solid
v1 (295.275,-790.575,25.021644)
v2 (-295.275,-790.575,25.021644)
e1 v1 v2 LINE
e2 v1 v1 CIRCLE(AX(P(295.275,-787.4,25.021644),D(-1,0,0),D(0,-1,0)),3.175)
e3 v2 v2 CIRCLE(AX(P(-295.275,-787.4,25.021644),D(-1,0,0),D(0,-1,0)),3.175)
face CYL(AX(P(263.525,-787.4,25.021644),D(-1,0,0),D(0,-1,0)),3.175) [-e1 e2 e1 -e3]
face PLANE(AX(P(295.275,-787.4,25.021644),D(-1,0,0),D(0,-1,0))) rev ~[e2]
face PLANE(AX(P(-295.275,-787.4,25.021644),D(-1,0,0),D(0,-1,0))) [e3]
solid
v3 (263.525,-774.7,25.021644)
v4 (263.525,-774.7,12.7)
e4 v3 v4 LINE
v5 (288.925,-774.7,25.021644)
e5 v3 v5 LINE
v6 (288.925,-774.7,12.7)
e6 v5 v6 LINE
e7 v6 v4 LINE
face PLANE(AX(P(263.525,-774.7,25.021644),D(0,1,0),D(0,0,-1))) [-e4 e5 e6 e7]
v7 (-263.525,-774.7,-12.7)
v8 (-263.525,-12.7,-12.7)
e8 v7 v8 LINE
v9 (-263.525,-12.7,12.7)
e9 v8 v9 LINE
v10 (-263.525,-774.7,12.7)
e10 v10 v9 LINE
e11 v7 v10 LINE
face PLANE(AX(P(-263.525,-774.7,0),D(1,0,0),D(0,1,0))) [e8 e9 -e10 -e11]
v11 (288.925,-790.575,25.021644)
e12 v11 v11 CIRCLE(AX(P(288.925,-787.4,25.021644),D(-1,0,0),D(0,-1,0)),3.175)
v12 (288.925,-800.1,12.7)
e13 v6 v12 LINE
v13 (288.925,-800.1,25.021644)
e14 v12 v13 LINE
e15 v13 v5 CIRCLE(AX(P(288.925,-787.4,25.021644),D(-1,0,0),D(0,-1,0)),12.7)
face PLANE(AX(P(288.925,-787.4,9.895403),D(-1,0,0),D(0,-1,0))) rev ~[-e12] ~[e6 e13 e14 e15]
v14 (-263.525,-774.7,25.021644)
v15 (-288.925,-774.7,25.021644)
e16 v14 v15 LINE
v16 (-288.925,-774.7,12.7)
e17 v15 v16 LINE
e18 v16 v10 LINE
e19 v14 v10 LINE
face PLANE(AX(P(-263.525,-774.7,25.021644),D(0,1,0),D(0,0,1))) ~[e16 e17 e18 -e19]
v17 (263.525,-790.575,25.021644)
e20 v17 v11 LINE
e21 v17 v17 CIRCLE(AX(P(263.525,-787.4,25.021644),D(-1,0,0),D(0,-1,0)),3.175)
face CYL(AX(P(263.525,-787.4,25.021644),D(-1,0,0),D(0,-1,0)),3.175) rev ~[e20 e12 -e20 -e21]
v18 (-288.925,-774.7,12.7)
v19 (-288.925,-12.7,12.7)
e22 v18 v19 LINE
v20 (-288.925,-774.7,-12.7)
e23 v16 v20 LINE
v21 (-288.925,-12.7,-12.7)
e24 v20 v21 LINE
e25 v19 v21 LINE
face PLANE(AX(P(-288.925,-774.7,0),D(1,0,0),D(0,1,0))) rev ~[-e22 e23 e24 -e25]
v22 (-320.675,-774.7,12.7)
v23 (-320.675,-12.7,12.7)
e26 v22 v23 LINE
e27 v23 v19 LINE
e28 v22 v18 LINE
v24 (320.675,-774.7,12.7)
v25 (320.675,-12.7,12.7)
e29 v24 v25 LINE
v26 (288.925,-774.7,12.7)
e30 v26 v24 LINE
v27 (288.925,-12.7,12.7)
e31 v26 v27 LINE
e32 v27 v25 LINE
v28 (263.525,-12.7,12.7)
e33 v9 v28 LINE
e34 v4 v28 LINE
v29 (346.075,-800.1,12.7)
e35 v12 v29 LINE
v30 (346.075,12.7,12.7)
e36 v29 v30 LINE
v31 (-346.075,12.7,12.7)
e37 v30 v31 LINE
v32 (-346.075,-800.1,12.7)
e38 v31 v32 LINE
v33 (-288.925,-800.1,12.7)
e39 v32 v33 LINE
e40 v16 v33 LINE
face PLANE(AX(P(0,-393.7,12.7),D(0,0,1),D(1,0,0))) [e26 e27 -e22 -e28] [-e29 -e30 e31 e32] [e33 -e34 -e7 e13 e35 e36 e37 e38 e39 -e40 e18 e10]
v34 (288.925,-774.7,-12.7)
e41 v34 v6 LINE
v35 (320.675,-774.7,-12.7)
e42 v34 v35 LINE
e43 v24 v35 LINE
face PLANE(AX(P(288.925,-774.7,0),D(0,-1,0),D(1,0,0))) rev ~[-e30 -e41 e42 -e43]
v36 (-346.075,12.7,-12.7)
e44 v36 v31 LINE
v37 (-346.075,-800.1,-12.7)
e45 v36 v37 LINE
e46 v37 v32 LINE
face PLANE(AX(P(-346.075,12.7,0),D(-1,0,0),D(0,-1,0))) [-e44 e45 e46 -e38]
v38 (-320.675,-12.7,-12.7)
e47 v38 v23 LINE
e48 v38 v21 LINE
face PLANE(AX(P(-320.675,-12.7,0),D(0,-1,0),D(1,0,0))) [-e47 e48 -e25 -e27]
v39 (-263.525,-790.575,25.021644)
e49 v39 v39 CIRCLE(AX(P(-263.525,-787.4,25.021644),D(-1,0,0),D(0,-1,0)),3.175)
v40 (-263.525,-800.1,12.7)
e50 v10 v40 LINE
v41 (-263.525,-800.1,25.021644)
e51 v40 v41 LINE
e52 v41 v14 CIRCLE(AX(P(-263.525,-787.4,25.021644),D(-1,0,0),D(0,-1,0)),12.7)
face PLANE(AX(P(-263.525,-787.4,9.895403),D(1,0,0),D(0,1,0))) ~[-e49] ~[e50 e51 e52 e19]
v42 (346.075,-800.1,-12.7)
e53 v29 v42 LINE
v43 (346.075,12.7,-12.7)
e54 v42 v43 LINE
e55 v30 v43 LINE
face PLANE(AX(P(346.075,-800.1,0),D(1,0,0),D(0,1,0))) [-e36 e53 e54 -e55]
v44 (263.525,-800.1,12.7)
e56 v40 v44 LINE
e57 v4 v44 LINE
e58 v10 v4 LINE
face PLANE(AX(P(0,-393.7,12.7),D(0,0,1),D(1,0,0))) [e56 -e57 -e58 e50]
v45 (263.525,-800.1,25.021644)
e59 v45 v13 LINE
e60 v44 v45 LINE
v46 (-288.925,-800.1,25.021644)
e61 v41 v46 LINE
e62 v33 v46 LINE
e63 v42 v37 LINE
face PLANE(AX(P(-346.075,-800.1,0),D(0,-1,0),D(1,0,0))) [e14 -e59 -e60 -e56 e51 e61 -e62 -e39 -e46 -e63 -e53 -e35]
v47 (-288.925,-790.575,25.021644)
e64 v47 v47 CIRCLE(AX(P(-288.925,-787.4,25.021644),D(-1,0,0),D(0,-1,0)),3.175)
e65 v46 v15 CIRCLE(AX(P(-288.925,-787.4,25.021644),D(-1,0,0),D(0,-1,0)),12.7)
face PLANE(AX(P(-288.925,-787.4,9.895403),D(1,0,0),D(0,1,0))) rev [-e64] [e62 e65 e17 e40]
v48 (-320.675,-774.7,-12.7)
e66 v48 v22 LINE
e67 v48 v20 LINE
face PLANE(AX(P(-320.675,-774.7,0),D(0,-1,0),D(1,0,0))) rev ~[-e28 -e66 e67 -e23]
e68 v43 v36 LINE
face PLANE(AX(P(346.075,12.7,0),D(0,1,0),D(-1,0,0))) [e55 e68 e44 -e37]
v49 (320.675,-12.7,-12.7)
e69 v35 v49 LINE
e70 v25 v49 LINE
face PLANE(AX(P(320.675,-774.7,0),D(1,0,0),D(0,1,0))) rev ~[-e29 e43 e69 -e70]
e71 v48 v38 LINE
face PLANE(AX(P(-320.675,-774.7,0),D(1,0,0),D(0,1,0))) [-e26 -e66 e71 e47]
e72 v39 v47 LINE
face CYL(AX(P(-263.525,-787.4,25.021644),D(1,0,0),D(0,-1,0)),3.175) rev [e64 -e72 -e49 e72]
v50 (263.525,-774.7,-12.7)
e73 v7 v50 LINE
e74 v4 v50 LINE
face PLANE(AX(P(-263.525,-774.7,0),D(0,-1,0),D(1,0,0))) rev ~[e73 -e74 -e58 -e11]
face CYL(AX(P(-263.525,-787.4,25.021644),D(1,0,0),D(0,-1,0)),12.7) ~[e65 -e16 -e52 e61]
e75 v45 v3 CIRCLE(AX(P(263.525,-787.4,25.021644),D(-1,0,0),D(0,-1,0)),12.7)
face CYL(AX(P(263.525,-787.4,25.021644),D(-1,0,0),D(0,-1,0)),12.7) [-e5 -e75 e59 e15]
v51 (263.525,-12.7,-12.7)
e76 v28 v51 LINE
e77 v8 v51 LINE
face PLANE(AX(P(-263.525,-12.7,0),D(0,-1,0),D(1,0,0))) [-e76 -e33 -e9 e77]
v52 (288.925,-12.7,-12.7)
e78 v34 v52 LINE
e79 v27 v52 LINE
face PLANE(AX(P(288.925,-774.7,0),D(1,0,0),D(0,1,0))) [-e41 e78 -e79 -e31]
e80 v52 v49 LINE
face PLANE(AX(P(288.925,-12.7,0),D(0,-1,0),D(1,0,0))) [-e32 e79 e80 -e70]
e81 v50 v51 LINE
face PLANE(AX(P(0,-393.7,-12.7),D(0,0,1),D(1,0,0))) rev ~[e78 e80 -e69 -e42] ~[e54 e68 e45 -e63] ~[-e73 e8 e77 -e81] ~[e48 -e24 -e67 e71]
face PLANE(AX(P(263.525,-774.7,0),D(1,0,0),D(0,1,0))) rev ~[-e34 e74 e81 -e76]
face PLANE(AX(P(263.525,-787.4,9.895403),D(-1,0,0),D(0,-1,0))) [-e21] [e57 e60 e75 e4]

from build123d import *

# Parameters (mm, degrees)
F0_W     = 31.75
F0_H     = 762
F0_W_2   = 527.05
F1_DEPTH = 12.7
F2_R     = 3.175
F3_DEPTH = 25.4
F4_DEPTH = 558.8
F5_DEPTH = 31.75


# Not quite as in the source:
# - a pattern or mirror of a feature is missing from the dataset's text; its kind, count and spacing are read off the source's solid


with BuildPart() as f1:
    # F0 (on Top) → F1 (new body, symmetric)
    with BuildSketch(Plane.XY):
        Polygon((346.075, -12.7), (346.075, 12.7), (-346.075, 12.7), (-346.075, -800.1), (346.075, -800.1), align=None)
        with Locations((-304.8, -393.7)):
            Rectangle(F0_W, F0_H, mode=Mode.SUBTRACT)
        with Locations((0, -393.7)):
            Rectangle(F0_W_2, F0_H, mode=Mode.SUBTRACT)
        with Locations((304.8, -393.7)):
            Rectangle(F0_W, F0_H, mode=Mode.SUBTRACT)
    extrude(amount=F1_DEPTH, both=True)

    # F2 (on face) → F3 (join)
    with BuildSketch(Plane(origin=(263.525, 0, 0), x_dir=(0, -1, 0), z_dir=(-1, 0, 0))):
        with BuildLine():
            Line((800.1, -12.7), (800.1, 12.7))
            Line((800.1, 12.7), (800.1, 25.0216443092))
            ThreePointArc((800.1, 25.0216443092), (787.4, 37.7216443092), (774.7, 25.0216443092))
            Line((774.7, 25.0216443092), (774.7, 12.7))
            Line((774.7, 12.7), (774.7, -12.7))
            Line((774.7, -12.7), (800.1, -12.7))
        make_face()
        with Locations((787.4, 25.0216443092)):
            Circle(F2_R, mode=Mode.SUBTRACT)
    f3 = extrude(amount=-F3_DEPTH)

    # F3_copies: F3 across plane
    add(f3.mirror(Plane(origin=(0, 0, 0), x_dir=(0, 0, -1), z_dir=(-1, 0, 0))))


with BuildPart() as f4:
    # F2 (on face) → F4 (new body)
    with BuildSketch(Plane(origin=(263.525, 0, 0), x_dir=(0, -1, 0), z_dir=(-1, 0, 0))):
        with Locations((787.4, 25.0216443092)):
            Circle(F2_R)
    extrude(amount=F4_DEPTH)

    # F2 (on face) → F5 (join)
    with BuildSketch(Plane(origin=(263.525, 0, 0), x_dir=(0, -1, 0), z_dir=(-1, 0, 0))):
        with Locations((787.4, 25.0216443092)):
            Circle(F2_R)
    extrude(amount=-F5_DEPTH)


solid = Compound([f1.part, f4.part])
